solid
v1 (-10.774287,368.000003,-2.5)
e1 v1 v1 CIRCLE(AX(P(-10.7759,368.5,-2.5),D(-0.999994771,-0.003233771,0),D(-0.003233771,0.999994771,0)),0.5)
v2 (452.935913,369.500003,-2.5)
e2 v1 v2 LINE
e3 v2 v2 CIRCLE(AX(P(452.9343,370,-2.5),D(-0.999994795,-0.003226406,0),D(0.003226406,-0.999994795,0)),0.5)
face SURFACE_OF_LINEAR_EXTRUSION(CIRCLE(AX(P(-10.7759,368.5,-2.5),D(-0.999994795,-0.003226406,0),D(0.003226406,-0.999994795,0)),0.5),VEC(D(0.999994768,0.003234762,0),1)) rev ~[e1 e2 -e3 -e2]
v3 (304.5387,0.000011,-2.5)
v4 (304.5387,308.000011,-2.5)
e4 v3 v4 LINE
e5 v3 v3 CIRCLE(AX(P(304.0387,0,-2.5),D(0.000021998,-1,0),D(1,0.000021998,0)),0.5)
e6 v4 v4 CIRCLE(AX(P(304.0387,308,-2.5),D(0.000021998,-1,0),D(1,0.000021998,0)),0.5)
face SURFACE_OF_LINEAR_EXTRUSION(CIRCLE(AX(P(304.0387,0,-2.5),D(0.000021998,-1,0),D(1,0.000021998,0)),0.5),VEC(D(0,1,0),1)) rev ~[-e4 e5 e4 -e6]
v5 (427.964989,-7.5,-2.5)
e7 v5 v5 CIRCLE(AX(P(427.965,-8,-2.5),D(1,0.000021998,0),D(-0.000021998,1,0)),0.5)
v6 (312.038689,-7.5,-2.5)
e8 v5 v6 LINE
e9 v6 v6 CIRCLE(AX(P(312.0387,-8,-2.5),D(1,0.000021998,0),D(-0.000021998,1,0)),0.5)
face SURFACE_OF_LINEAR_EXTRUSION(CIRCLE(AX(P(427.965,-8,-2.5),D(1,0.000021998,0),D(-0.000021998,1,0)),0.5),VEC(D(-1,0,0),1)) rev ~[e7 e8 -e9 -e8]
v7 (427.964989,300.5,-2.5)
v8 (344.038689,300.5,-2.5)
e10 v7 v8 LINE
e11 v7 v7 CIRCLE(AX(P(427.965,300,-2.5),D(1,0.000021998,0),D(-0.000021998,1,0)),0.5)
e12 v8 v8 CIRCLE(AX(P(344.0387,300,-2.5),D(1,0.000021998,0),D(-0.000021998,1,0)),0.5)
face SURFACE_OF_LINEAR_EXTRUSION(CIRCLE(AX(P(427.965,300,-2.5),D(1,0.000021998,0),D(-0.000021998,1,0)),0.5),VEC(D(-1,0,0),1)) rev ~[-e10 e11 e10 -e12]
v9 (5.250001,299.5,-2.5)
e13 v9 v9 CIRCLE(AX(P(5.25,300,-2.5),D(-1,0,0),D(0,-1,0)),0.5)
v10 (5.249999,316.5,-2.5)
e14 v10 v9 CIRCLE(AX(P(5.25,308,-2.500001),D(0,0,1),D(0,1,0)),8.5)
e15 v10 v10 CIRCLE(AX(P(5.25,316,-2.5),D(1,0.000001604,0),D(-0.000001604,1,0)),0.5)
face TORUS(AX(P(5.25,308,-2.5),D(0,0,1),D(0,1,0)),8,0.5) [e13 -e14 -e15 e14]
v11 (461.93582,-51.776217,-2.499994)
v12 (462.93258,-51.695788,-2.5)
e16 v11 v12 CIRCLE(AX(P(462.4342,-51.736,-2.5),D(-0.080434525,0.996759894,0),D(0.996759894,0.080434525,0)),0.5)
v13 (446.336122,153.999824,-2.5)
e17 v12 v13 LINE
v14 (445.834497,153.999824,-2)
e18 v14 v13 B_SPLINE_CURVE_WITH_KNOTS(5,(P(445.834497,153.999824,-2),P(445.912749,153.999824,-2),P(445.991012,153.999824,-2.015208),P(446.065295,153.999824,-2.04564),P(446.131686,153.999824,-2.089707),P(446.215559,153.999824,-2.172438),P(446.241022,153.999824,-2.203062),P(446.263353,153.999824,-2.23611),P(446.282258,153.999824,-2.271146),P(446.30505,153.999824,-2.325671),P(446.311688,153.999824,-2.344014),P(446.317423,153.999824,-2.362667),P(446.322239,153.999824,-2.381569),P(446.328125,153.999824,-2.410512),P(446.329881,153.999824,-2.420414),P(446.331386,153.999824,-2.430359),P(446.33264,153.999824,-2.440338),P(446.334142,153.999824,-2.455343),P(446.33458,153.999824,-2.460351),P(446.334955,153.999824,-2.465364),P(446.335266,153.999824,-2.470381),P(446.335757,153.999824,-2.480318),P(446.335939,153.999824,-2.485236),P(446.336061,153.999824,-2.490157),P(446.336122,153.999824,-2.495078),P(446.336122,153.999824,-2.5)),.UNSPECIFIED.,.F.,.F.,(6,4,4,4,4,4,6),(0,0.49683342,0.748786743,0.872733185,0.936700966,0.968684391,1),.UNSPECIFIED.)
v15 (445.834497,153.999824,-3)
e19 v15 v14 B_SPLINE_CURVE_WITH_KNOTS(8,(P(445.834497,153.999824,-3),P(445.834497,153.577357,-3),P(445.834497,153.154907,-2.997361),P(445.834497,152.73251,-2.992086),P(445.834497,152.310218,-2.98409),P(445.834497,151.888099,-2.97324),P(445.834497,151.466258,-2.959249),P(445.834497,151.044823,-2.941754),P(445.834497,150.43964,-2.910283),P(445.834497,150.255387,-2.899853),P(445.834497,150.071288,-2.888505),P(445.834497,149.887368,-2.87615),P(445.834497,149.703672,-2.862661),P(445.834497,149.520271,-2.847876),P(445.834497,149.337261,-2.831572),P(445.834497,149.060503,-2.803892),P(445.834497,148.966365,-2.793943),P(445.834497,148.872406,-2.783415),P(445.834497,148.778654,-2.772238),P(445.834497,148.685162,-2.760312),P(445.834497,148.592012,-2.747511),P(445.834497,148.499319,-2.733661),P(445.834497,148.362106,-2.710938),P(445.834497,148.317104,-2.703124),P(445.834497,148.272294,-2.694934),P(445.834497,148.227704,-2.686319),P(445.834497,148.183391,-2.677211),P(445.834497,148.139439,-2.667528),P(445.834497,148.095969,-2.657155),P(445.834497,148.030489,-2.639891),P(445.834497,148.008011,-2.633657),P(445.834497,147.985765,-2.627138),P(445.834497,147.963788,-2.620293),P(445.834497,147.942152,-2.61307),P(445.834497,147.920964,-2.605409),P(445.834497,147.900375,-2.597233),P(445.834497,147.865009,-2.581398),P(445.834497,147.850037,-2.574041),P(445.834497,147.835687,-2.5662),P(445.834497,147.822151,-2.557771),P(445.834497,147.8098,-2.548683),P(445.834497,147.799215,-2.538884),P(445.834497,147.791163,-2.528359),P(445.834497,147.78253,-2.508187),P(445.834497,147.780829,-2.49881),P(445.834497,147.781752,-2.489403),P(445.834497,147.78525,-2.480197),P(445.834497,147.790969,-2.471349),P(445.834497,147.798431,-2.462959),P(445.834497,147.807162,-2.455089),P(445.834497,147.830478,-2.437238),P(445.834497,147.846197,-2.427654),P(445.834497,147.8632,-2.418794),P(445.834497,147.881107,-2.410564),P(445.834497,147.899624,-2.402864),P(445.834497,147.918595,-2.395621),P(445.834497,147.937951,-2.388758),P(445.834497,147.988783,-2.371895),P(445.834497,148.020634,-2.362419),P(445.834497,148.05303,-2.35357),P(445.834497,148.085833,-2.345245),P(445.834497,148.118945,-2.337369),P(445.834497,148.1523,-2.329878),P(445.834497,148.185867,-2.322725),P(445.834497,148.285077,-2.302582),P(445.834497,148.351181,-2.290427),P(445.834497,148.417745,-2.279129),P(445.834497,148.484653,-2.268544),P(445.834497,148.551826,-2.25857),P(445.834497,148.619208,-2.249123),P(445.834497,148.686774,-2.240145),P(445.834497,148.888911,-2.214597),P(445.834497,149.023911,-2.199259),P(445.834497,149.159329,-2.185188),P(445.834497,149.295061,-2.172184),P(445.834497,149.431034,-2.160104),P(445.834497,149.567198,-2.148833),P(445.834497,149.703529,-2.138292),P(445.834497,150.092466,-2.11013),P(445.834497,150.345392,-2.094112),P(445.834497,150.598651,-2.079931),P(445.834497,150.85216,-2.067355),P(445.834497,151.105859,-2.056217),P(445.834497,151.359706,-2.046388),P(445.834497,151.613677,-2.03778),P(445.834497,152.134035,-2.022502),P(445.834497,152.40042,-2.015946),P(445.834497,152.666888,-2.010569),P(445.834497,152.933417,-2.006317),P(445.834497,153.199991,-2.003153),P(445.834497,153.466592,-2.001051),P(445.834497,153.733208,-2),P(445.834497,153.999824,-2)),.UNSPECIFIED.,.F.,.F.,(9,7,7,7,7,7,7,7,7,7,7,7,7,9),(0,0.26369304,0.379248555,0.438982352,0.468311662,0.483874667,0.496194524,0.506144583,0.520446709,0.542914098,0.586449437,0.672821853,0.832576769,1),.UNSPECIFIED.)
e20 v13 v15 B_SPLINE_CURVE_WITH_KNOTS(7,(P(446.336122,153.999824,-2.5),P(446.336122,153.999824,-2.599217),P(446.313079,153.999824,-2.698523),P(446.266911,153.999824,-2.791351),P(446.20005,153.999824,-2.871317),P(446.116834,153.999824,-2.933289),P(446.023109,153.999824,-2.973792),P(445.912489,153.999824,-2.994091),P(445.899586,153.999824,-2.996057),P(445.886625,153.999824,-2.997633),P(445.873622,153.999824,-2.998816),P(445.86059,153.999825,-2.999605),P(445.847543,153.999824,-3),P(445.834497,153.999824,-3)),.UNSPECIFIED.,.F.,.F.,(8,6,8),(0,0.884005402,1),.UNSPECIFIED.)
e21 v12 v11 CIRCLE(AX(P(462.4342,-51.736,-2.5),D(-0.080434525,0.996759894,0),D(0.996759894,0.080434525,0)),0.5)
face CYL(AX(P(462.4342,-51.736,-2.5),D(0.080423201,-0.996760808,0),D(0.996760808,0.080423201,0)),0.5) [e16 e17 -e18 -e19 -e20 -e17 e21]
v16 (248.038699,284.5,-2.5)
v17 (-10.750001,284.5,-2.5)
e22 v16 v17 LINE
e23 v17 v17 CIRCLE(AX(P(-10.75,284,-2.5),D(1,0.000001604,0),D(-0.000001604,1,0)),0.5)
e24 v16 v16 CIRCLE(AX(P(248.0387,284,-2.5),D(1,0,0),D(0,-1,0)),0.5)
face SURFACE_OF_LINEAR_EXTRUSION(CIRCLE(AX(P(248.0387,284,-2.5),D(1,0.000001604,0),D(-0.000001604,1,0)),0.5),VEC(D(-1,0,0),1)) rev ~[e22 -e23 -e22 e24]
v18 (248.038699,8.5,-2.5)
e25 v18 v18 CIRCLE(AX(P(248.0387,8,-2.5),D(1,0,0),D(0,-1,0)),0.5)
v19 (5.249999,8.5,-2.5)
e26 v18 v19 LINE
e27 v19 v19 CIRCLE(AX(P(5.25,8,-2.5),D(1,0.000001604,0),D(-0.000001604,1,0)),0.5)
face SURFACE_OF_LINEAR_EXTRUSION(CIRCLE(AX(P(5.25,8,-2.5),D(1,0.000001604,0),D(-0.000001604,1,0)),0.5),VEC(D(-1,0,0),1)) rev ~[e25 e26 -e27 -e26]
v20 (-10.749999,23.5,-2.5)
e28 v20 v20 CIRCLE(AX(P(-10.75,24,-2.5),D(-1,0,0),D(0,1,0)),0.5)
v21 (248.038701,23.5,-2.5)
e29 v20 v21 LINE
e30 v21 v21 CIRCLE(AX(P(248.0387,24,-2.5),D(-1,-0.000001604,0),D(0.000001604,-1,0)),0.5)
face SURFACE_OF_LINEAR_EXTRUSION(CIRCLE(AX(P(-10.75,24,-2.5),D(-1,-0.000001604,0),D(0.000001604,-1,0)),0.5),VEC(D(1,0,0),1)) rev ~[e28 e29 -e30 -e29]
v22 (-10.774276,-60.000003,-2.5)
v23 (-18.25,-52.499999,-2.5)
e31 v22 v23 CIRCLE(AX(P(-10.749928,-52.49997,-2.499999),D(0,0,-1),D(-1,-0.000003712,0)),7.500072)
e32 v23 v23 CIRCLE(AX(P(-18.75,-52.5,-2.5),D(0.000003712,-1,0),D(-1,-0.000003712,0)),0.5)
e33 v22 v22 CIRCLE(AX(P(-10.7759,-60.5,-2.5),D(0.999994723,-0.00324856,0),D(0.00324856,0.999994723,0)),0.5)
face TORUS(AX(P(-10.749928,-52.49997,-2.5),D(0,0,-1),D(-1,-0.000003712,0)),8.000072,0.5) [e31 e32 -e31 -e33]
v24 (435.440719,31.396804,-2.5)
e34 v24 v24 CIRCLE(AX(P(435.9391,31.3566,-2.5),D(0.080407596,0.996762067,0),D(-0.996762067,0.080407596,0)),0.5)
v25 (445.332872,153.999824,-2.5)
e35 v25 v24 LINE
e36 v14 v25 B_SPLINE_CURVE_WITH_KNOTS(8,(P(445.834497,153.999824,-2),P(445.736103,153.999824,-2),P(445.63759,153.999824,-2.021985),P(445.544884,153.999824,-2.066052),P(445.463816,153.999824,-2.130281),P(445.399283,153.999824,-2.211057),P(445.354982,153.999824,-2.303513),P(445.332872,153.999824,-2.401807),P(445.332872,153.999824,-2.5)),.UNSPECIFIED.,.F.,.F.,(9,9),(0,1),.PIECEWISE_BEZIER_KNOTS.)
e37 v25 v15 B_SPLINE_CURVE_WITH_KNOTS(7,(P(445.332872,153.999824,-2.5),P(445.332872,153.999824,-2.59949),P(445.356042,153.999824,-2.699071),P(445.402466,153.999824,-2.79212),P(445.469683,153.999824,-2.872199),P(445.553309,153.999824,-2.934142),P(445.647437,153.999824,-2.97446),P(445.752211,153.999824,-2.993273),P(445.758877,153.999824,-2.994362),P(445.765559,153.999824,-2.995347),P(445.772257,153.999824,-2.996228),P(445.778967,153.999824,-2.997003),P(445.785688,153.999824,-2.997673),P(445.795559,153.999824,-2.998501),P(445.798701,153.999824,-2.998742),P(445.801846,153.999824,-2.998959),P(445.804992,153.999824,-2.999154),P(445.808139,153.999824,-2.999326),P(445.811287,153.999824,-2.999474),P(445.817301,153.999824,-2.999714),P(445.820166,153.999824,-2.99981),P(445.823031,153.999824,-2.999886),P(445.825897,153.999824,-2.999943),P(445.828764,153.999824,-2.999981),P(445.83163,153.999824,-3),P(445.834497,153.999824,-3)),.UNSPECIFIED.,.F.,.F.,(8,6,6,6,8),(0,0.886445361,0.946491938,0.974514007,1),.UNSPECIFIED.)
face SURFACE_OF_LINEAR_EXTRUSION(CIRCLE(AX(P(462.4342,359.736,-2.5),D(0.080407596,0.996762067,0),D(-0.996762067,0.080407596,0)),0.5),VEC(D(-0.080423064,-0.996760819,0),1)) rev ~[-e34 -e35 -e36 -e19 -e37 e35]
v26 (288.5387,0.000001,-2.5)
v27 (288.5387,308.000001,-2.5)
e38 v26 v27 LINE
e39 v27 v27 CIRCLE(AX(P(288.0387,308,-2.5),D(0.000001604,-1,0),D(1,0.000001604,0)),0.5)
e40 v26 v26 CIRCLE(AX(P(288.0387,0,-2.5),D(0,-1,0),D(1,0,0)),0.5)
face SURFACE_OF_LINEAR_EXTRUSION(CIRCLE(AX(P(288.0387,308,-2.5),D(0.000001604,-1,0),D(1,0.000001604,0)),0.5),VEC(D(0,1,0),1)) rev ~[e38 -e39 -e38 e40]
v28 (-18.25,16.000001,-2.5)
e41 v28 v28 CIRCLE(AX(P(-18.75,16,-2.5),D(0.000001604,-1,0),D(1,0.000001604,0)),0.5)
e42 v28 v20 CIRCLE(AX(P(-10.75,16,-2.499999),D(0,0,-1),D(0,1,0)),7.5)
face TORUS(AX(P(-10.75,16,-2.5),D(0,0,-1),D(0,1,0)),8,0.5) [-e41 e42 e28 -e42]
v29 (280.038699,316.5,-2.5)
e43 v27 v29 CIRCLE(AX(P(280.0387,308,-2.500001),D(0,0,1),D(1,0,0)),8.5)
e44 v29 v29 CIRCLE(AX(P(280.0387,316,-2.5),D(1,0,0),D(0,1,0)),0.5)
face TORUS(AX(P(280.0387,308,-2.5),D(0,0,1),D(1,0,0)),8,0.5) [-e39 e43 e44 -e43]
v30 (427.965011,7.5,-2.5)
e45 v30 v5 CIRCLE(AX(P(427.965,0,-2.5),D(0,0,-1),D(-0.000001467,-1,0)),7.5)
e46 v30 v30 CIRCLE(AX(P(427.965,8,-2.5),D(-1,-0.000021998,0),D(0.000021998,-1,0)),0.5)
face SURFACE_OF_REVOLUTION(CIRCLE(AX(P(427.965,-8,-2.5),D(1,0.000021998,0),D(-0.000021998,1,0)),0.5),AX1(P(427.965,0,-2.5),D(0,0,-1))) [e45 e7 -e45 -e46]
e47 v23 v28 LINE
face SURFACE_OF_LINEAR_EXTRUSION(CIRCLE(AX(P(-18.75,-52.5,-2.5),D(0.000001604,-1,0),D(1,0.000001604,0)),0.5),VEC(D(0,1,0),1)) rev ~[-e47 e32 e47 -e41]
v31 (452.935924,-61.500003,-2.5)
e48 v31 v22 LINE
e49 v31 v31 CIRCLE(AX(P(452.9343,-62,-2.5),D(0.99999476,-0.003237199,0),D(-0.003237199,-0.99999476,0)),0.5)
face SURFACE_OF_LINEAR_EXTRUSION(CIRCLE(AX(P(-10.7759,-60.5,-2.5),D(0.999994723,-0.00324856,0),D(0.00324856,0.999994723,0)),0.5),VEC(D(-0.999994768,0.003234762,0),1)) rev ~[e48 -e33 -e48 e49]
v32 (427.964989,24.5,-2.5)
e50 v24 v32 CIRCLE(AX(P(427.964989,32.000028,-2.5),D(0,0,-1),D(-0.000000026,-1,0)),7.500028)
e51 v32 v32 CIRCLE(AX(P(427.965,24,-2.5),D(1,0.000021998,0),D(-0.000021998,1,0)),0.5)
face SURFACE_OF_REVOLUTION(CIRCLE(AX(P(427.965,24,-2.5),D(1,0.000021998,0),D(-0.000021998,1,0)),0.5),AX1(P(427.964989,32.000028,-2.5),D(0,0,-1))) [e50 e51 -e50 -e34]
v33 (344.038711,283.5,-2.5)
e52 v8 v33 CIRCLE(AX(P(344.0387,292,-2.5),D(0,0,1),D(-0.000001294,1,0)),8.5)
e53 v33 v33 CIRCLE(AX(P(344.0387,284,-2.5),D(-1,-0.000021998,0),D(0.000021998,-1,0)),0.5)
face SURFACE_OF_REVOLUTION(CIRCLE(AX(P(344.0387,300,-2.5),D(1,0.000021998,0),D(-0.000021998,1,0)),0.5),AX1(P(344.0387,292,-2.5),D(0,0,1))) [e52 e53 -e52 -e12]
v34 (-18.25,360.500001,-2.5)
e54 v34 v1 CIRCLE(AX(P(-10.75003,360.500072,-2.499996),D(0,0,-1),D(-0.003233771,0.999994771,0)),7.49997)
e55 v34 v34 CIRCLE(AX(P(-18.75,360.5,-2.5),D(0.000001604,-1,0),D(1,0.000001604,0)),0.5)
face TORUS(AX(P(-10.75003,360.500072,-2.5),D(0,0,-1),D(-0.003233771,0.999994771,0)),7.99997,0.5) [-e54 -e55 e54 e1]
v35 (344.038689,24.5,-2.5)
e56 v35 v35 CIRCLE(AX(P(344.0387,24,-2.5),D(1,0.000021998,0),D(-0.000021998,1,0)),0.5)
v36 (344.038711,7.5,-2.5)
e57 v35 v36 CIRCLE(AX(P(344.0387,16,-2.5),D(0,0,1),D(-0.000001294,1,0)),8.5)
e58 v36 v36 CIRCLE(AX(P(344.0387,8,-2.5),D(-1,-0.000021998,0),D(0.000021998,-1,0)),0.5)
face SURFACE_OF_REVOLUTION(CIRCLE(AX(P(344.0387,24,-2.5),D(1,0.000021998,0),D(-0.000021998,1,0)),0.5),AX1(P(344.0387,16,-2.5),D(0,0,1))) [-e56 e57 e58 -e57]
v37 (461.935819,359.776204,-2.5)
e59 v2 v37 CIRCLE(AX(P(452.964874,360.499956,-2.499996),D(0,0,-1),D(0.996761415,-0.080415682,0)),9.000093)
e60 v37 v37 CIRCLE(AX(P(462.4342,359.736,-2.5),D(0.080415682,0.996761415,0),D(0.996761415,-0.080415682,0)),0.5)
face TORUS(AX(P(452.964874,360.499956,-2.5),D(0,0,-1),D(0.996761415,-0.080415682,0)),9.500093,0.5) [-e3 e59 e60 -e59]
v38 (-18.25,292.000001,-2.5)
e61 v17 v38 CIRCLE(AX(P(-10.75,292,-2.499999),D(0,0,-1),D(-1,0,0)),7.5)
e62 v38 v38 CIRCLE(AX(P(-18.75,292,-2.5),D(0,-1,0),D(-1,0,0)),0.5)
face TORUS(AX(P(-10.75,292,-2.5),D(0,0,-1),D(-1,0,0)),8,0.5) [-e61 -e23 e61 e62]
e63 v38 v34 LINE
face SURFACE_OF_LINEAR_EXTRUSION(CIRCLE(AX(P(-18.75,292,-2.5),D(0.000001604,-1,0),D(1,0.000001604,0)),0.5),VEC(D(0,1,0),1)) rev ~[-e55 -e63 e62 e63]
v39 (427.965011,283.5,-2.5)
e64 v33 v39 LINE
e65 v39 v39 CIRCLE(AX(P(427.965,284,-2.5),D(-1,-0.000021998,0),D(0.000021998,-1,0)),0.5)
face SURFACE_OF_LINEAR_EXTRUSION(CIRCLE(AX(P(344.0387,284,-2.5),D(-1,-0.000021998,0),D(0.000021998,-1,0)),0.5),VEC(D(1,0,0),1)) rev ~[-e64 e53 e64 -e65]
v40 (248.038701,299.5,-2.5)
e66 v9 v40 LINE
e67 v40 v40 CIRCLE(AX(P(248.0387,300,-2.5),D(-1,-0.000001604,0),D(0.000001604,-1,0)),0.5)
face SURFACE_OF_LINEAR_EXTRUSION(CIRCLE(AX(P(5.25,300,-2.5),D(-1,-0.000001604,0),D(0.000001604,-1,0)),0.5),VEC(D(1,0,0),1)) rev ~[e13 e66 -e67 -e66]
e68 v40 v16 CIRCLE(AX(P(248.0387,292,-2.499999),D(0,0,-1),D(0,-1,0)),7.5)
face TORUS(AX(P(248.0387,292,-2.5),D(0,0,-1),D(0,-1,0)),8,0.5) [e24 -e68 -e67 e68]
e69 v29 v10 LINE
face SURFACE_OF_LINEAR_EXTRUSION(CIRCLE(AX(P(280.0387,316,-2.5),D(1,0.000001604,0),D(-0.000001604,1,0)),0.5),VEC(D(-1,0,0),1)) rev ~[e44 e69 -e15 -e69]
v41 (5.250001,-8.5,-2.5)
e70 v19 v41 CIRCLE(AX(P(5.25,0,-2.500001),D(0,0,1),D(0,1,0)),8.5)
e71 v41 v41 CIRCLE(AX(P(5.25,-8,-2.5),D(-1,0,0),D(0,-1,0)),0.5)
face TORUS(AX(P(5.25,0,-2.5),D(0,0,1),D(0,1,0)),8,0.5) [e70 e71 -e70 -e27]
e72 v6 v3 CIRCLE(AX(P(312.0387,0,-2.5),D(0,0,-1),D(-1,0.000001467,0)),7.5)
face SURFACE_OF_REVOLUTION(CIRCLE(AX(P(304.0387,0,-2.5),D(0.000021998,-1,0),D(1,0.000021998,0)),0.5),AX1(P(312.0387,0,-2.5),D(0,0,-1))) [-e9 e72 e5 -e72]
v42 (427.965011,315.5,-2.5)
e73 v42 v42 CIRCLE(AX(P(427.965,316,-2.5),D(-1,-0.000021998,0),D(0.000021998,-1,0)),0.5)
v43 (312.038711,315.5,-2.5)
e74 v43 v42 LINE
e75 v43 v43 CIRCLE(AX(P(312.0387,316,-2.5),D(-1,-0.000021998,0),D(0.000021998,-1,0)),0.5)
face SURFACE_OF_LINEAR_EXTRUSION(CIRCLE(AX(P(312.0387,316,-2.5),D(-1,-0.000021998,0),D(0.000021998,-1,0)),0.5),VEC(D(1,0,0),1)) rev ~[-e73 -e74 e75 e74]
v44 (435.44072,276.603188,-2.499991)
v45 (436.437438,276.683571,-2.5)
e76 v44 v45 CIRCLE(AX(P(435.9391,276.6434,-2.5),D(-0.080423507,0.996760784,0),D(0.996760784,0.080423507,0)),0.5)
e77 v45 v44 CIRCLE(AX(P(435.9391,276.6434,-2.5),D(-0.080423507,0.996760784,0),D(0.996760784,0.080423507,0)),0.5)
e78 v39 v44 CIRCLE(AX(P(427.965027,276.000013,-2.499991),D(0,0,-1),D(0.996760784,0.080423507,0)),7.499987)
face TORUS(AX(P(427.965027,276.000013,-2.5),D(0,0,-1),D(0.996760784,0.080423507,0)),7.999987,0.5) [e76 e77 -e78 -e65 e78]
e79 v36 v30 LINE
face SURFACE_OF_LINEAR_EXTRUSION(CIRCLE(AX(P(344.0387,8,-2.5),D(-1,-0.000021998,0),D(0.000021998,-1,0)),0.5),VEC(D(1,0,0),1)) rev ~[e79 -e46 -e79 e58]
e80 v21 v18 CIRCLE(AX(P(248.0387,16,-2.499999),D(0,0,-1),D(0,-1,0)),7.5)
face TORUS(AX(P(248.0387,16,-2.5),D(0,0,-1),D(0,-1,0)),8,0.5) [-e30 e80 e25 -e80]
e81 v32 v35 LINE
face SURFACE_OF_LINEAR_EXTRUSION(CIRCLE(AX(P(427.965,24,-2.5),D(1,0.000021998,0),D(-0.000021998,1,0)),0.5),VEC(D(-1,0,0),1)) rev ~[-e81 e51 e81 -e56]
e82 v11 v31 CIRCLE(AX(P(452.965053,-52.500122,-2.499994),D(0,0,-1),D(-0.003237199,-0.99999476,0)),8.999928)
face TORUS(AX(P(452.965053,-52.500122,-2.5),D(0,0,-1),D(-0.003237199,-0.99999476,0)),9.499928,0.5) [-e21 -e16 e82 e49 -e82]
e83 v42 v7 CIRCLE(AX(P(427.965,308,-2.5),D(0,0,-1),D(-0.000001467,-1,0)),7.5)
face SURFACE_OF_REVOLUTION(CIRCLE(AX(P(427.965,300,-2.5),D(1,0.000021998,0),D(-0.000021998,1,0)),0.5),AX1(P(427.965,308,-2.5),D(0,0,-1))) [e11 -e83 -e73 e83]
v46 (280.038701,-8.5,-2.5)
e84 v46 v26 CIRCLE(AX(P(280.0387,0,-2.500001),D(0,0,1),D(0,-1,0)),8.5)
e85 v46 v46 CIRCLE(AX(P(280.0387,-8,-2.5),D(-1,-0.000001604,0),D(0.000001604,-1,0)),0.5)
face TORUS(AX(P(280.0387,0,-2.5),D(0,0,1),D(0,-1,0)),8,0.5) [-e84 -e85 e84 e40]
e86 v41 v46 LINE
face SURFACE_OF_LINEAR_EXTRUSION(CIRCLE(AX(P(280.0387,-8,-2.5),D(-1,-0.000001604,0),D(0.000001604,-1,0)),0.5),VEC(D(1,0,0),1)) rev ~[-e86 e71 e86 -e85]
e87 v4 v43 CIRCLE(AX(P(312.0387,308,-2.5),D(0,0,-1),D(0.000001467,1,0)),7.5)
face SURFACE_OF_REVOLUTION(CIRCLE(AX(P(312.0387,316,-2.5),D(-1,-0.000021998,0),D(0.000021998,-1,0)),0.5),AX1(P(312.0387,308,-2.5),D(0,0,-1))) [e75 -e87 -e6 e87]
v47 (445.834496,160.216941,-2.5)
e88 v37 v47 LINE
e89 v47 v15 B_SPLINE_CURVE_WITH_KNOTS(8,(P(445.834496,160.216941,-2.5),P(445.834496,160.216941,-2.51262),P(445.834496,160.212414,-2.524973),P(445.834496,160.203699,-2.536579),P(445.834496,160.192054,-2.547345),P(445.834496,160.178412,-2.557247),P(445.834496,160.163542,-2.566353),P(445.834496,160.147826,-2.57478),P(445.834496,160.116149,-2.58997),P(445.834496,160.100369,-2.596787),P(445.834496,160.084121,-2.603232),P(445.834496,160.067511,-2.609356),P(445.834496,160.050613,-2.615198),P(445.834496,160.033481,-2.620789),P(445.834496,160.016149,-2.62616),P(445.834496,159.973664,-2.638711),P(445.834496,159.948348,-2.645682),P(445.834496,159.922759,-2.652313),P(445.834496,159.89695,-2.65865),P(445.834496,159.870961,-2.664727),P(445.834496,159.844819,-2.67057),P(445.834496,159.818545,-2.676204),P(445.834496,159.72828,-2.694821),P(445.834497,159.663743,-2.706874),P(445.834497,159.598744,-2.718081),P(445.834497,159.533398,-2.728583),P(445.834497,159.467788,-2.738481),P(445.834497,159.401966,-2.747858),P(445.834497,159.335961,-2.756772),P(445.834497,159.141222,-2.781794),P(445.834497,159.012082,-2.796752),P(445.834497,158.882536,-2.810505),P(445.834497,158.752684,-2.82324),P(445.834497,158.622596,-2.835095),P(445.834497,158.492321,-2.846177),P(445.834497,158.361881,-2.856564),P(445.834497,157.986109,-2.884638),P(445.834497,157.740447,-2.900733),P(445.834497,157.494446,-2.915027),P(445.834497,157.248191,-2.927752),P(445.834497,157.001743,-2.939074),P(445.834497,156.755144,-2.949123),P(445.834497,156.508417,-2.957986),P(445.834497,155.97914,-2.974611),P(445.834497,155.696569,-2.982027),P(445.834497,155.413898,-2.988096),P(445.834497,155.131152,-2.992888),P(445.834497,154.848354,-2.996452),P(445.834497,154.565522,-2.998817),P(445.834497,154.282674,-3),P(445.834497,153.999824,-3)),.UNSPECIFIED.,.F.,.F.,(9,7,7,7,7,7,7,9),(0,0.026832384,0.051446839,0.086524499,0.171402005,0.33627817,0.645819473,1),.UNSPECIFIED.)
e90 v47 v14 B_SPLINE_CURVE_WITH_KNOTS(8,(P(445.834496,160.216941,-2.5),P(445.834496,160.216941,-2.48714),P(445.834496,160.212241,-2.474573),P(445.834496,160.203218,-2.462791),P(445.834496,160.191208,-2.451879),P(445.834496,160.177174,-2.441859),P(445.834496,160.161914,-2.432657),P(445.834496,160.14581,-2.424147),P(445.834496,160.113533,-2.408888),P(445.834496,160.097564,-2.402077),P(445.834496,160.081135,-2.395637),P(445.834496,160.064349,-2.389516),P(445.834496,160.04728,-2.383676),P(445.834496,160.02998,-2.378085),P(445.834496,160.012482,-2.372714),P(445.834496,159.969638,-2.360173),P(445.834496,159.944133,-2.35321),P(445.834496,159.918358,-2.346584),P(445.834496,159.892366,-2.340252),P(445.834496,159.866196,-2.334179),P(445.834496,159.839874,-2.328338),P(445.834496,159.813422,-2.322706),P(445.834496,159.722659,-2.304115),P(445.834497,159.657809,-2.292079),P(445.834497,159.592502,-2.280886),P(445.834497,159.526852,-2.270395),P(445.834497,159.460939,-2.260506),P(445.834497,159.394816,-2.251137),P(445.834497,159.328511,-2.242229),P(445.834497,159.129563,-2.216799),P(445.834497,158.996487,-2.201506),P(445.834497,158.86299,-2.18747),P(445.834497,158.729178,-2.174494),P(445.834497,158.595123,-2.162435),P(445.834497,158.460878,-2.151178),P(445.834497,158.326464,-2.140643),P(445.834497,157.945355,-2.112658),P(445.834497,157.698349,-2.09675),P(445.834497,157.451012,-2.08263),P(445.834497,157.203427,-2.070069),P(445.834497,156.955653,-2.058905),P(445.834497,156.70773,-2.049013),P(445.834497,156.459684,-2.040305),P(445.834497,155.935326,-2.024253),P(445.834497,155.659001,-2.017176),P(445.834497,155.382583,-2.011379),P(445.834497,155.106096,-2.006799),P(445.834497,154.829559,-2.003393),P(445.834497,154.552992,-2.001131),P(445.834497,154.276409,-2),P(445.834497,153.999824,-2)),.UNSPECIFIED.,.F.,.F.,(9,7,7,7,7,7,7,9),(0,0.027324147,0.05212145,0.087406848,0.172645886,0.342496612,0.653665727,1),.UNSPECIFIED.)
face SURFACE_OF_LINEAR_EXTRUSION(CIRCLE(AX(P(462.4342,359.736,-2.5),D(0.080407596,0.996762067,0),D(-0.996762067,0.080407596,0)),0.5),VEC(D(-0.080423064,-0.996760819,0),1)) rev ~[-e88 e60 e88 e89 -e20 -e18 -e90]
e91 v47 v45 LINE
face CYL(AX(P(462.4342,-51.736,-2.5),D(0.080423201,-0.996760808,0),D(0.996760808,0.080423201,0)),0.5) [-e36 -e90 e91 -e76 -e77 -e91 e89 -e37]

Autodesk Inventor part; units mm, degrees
ref_plane "YZ Plane" through (0, 0, 0) normal (1, 0, 0) x (0, 1, 0)
ref_plane "XZ Plane" through (0, 0, 0) normal (0, 1, 0) x (-1, 0, 0)
ref_plane "Work Plane1" through (0, 0, -2.5) normal (0, 0, 1) x (1, 0, 0)
sketch "Sketch1" plane through (0, 0, -2.5) normal (0, 0, 1) x (1, 0, 0)
  circle A0 centre (-10.75, -52.5) radius 8 construction
  circle A1 centre (5.25, 0) radius 8 construction
  circle A2 centre (-10.75, 16) radius 8 construction
  circle A3 centre (248.0387, 16) radius 8 construction
  circle A4 centre (280.0387, 0) radius 8 construction
  circle A5 centre (312.0387, 0) radius 8 construction
  circle A6 centre (344.0387, 16) radius 8 construction
  circle A7 centre (452.965, -52.5) radius 9 construction
  circle A8 centre (427.965, 0) radius 8 construction
  circle A9 centre (427.965, 32) radius 8 construction
  circle A10 centre (427.965, 276) radius 8 construction
  circle A11 centre (427.965, 308) radius 8 construction
  circle A12 centre (452.965, 360.5) radius 9 construction
  circle A13 centre (344.0387, 292) radius 8 construction
  circle A14 centre (312.0387, 308) radius 8 construction
  circle A15 centre (280.0387, 308) radius 8 construction
  circle A16 centre (248.0387, 292) radius 8 construction
  circle A17 centre (-10.75, 292) radius 8 construction
  circle A18 centre (5.25, 308) radius 8 construction
  circle A19 centre (-10.75, 360.5) radius 8 construction
  line L0 (-18.75, -52.5) -> (-18.75, 16)
  line L1 (280.0387, 316) -> (5.25, 316)
  arc A20 (5.25, 316) -> (5.25, 300) centre (5.25, 308) ccw
  line L2 (5.25, 300) -> (248.0387, 300)
  line L3 (248.0387, 284) -> (-10.75, 284)
  arc A21 (248.0387, 284) -> (248.0387, 300) centre (248.0387, 292) ccw
  arc A22 (-18.75, 292) -> (-10.75, 284) centre (-10.75, 292) ccw
  line L4 (-18.75, 292) -> (-18.75, 360.5)
  line L5 (-10.7759, 368.5) -> (452.9343, 370)
  arc A23 (462.4342, 359.736) -> (452.9343, 370) centre (452.965, 360.5) ccw
  arc A24 (-10.7759, 368.5) -> (-18.75, 360.5) centre (-10.75, 360.5) ccw
  line L6 (462.4342, -51.736) -> (435.9391, 276.6434) construction
  line L7 (462.4342, 359.736) -> (435.9391, 31.3566)
  arc A25 (427.965, 24) -> (435.9391, 31.3566) centre (427.965, 32) ccw
  line L8 (427.965, 24) -> (344.0387, 24)
  arc A26 (344.0387, 24) -> (344.0387, 8) centre (344.0387, 16) ccw
  line L9 (344.0387, 8) -> (427.965, 8)
  line L10 (304.0387, 0) -> (304.0387, 308)
  line L11 (427.965, -8) -> (312.0387, -8)
  arc A27 (427.965, -8) -> (427.965, 8) centre (427.965, 0) ccw
  arc A28 (304.0387, 0) -> (312.0387, -8) centre (312.0387, 0) ccw
  line L12 (288.0387, 308) -> (288.0387, 0)
  arc A29 (288.0387, 308) -> (280.0387, 316) centre (280.0387, 308) ccw
  line L13 (280.0387, -8) -> (5.25, -8)
  line L14 (5.25, 8) -> (248.0387, 8)
  line L15 (-10.75, 24) -> (248.0387, 24)
  arc A30 (-10.75, 24) -> (-18.75, 16) centre (-10.75, 16) ccw
  arc A31 (248.0387, 8) -> (248.0387, 24) centre (248.0387, 16) ccw
  arc A32 (5.25, 8) -> (5.25, -8) centre (5.25, 0) ccw
  line L16 (312.0387, 316) -> (427.965, 316)
  arc A33 (452.9343, -62) -> (462.4342, -51.736) centre (452.965, -52.5) ccw
  line L17 (-10.7759, -60.5) -> (452.9343, -62)
  arc A34 (-18.75, -52.5) -> (-10.7759, -60.5) centre (-10.75, -52.5) ccw
  arc A35 (280.0387, -8) -> (288.0387, 0) centre (280.0387, 0) ccw
  arc A36 (312.0387, 316) -> (304.0387, 308) centre (312.0387, 308) ccw
  line L18 (427.965, 300) -> (344.0387, 300)
  line L19 (344.0387, 284) -> (427.965, 284)
  arc A37 (344.0387, 300) -> (344.0387, 284) centre (344.0387, 292) ccw
  arc A38 (435.9391, 276.6434) -> (427.965, 284) centre (427.965, 276) ccw
  arc A39 (427.965, 300) -> (427.965, 316) centre (427.965, 308) ccw
  dimension "d2" = 0.5
  dimension "d4" = 0.5
ref_plane "Work Plane2" through (462.4342, -51.736, -2.5) normal (-0.0804232, 0.9967608, 0) x (-0.9967608, -0.0804232, 0)
sketch "Sketch2" plane through (462.4342, -51.736, -2.5) normal (-0.0804232, 0.9967608, 0) x (-0.9967608, -0.0804232, 0)
  circle A0 centre (0, 0) radius 0.5
  point P0 (456.7755, 2.5)
  dimension "d5" = 1
sweep "Sweep1" add profiles "Sketch2" path "Sketch1"
sketch "Sketch3" plane through (462.4342, -51.736, -2.5) normal (-0.0804232, 0.9967608, 0) x (0.9967608, 0.0804232, 0)
  circle A0 centre (0, 0) radius 0.5 projected
  point P0 (-456.7755, -2.5)
extrude "Extrusion1" add sketch "Sketch3" along normal up to surface (329.4465 mm away)
properties part number "STRING GANTRY"
